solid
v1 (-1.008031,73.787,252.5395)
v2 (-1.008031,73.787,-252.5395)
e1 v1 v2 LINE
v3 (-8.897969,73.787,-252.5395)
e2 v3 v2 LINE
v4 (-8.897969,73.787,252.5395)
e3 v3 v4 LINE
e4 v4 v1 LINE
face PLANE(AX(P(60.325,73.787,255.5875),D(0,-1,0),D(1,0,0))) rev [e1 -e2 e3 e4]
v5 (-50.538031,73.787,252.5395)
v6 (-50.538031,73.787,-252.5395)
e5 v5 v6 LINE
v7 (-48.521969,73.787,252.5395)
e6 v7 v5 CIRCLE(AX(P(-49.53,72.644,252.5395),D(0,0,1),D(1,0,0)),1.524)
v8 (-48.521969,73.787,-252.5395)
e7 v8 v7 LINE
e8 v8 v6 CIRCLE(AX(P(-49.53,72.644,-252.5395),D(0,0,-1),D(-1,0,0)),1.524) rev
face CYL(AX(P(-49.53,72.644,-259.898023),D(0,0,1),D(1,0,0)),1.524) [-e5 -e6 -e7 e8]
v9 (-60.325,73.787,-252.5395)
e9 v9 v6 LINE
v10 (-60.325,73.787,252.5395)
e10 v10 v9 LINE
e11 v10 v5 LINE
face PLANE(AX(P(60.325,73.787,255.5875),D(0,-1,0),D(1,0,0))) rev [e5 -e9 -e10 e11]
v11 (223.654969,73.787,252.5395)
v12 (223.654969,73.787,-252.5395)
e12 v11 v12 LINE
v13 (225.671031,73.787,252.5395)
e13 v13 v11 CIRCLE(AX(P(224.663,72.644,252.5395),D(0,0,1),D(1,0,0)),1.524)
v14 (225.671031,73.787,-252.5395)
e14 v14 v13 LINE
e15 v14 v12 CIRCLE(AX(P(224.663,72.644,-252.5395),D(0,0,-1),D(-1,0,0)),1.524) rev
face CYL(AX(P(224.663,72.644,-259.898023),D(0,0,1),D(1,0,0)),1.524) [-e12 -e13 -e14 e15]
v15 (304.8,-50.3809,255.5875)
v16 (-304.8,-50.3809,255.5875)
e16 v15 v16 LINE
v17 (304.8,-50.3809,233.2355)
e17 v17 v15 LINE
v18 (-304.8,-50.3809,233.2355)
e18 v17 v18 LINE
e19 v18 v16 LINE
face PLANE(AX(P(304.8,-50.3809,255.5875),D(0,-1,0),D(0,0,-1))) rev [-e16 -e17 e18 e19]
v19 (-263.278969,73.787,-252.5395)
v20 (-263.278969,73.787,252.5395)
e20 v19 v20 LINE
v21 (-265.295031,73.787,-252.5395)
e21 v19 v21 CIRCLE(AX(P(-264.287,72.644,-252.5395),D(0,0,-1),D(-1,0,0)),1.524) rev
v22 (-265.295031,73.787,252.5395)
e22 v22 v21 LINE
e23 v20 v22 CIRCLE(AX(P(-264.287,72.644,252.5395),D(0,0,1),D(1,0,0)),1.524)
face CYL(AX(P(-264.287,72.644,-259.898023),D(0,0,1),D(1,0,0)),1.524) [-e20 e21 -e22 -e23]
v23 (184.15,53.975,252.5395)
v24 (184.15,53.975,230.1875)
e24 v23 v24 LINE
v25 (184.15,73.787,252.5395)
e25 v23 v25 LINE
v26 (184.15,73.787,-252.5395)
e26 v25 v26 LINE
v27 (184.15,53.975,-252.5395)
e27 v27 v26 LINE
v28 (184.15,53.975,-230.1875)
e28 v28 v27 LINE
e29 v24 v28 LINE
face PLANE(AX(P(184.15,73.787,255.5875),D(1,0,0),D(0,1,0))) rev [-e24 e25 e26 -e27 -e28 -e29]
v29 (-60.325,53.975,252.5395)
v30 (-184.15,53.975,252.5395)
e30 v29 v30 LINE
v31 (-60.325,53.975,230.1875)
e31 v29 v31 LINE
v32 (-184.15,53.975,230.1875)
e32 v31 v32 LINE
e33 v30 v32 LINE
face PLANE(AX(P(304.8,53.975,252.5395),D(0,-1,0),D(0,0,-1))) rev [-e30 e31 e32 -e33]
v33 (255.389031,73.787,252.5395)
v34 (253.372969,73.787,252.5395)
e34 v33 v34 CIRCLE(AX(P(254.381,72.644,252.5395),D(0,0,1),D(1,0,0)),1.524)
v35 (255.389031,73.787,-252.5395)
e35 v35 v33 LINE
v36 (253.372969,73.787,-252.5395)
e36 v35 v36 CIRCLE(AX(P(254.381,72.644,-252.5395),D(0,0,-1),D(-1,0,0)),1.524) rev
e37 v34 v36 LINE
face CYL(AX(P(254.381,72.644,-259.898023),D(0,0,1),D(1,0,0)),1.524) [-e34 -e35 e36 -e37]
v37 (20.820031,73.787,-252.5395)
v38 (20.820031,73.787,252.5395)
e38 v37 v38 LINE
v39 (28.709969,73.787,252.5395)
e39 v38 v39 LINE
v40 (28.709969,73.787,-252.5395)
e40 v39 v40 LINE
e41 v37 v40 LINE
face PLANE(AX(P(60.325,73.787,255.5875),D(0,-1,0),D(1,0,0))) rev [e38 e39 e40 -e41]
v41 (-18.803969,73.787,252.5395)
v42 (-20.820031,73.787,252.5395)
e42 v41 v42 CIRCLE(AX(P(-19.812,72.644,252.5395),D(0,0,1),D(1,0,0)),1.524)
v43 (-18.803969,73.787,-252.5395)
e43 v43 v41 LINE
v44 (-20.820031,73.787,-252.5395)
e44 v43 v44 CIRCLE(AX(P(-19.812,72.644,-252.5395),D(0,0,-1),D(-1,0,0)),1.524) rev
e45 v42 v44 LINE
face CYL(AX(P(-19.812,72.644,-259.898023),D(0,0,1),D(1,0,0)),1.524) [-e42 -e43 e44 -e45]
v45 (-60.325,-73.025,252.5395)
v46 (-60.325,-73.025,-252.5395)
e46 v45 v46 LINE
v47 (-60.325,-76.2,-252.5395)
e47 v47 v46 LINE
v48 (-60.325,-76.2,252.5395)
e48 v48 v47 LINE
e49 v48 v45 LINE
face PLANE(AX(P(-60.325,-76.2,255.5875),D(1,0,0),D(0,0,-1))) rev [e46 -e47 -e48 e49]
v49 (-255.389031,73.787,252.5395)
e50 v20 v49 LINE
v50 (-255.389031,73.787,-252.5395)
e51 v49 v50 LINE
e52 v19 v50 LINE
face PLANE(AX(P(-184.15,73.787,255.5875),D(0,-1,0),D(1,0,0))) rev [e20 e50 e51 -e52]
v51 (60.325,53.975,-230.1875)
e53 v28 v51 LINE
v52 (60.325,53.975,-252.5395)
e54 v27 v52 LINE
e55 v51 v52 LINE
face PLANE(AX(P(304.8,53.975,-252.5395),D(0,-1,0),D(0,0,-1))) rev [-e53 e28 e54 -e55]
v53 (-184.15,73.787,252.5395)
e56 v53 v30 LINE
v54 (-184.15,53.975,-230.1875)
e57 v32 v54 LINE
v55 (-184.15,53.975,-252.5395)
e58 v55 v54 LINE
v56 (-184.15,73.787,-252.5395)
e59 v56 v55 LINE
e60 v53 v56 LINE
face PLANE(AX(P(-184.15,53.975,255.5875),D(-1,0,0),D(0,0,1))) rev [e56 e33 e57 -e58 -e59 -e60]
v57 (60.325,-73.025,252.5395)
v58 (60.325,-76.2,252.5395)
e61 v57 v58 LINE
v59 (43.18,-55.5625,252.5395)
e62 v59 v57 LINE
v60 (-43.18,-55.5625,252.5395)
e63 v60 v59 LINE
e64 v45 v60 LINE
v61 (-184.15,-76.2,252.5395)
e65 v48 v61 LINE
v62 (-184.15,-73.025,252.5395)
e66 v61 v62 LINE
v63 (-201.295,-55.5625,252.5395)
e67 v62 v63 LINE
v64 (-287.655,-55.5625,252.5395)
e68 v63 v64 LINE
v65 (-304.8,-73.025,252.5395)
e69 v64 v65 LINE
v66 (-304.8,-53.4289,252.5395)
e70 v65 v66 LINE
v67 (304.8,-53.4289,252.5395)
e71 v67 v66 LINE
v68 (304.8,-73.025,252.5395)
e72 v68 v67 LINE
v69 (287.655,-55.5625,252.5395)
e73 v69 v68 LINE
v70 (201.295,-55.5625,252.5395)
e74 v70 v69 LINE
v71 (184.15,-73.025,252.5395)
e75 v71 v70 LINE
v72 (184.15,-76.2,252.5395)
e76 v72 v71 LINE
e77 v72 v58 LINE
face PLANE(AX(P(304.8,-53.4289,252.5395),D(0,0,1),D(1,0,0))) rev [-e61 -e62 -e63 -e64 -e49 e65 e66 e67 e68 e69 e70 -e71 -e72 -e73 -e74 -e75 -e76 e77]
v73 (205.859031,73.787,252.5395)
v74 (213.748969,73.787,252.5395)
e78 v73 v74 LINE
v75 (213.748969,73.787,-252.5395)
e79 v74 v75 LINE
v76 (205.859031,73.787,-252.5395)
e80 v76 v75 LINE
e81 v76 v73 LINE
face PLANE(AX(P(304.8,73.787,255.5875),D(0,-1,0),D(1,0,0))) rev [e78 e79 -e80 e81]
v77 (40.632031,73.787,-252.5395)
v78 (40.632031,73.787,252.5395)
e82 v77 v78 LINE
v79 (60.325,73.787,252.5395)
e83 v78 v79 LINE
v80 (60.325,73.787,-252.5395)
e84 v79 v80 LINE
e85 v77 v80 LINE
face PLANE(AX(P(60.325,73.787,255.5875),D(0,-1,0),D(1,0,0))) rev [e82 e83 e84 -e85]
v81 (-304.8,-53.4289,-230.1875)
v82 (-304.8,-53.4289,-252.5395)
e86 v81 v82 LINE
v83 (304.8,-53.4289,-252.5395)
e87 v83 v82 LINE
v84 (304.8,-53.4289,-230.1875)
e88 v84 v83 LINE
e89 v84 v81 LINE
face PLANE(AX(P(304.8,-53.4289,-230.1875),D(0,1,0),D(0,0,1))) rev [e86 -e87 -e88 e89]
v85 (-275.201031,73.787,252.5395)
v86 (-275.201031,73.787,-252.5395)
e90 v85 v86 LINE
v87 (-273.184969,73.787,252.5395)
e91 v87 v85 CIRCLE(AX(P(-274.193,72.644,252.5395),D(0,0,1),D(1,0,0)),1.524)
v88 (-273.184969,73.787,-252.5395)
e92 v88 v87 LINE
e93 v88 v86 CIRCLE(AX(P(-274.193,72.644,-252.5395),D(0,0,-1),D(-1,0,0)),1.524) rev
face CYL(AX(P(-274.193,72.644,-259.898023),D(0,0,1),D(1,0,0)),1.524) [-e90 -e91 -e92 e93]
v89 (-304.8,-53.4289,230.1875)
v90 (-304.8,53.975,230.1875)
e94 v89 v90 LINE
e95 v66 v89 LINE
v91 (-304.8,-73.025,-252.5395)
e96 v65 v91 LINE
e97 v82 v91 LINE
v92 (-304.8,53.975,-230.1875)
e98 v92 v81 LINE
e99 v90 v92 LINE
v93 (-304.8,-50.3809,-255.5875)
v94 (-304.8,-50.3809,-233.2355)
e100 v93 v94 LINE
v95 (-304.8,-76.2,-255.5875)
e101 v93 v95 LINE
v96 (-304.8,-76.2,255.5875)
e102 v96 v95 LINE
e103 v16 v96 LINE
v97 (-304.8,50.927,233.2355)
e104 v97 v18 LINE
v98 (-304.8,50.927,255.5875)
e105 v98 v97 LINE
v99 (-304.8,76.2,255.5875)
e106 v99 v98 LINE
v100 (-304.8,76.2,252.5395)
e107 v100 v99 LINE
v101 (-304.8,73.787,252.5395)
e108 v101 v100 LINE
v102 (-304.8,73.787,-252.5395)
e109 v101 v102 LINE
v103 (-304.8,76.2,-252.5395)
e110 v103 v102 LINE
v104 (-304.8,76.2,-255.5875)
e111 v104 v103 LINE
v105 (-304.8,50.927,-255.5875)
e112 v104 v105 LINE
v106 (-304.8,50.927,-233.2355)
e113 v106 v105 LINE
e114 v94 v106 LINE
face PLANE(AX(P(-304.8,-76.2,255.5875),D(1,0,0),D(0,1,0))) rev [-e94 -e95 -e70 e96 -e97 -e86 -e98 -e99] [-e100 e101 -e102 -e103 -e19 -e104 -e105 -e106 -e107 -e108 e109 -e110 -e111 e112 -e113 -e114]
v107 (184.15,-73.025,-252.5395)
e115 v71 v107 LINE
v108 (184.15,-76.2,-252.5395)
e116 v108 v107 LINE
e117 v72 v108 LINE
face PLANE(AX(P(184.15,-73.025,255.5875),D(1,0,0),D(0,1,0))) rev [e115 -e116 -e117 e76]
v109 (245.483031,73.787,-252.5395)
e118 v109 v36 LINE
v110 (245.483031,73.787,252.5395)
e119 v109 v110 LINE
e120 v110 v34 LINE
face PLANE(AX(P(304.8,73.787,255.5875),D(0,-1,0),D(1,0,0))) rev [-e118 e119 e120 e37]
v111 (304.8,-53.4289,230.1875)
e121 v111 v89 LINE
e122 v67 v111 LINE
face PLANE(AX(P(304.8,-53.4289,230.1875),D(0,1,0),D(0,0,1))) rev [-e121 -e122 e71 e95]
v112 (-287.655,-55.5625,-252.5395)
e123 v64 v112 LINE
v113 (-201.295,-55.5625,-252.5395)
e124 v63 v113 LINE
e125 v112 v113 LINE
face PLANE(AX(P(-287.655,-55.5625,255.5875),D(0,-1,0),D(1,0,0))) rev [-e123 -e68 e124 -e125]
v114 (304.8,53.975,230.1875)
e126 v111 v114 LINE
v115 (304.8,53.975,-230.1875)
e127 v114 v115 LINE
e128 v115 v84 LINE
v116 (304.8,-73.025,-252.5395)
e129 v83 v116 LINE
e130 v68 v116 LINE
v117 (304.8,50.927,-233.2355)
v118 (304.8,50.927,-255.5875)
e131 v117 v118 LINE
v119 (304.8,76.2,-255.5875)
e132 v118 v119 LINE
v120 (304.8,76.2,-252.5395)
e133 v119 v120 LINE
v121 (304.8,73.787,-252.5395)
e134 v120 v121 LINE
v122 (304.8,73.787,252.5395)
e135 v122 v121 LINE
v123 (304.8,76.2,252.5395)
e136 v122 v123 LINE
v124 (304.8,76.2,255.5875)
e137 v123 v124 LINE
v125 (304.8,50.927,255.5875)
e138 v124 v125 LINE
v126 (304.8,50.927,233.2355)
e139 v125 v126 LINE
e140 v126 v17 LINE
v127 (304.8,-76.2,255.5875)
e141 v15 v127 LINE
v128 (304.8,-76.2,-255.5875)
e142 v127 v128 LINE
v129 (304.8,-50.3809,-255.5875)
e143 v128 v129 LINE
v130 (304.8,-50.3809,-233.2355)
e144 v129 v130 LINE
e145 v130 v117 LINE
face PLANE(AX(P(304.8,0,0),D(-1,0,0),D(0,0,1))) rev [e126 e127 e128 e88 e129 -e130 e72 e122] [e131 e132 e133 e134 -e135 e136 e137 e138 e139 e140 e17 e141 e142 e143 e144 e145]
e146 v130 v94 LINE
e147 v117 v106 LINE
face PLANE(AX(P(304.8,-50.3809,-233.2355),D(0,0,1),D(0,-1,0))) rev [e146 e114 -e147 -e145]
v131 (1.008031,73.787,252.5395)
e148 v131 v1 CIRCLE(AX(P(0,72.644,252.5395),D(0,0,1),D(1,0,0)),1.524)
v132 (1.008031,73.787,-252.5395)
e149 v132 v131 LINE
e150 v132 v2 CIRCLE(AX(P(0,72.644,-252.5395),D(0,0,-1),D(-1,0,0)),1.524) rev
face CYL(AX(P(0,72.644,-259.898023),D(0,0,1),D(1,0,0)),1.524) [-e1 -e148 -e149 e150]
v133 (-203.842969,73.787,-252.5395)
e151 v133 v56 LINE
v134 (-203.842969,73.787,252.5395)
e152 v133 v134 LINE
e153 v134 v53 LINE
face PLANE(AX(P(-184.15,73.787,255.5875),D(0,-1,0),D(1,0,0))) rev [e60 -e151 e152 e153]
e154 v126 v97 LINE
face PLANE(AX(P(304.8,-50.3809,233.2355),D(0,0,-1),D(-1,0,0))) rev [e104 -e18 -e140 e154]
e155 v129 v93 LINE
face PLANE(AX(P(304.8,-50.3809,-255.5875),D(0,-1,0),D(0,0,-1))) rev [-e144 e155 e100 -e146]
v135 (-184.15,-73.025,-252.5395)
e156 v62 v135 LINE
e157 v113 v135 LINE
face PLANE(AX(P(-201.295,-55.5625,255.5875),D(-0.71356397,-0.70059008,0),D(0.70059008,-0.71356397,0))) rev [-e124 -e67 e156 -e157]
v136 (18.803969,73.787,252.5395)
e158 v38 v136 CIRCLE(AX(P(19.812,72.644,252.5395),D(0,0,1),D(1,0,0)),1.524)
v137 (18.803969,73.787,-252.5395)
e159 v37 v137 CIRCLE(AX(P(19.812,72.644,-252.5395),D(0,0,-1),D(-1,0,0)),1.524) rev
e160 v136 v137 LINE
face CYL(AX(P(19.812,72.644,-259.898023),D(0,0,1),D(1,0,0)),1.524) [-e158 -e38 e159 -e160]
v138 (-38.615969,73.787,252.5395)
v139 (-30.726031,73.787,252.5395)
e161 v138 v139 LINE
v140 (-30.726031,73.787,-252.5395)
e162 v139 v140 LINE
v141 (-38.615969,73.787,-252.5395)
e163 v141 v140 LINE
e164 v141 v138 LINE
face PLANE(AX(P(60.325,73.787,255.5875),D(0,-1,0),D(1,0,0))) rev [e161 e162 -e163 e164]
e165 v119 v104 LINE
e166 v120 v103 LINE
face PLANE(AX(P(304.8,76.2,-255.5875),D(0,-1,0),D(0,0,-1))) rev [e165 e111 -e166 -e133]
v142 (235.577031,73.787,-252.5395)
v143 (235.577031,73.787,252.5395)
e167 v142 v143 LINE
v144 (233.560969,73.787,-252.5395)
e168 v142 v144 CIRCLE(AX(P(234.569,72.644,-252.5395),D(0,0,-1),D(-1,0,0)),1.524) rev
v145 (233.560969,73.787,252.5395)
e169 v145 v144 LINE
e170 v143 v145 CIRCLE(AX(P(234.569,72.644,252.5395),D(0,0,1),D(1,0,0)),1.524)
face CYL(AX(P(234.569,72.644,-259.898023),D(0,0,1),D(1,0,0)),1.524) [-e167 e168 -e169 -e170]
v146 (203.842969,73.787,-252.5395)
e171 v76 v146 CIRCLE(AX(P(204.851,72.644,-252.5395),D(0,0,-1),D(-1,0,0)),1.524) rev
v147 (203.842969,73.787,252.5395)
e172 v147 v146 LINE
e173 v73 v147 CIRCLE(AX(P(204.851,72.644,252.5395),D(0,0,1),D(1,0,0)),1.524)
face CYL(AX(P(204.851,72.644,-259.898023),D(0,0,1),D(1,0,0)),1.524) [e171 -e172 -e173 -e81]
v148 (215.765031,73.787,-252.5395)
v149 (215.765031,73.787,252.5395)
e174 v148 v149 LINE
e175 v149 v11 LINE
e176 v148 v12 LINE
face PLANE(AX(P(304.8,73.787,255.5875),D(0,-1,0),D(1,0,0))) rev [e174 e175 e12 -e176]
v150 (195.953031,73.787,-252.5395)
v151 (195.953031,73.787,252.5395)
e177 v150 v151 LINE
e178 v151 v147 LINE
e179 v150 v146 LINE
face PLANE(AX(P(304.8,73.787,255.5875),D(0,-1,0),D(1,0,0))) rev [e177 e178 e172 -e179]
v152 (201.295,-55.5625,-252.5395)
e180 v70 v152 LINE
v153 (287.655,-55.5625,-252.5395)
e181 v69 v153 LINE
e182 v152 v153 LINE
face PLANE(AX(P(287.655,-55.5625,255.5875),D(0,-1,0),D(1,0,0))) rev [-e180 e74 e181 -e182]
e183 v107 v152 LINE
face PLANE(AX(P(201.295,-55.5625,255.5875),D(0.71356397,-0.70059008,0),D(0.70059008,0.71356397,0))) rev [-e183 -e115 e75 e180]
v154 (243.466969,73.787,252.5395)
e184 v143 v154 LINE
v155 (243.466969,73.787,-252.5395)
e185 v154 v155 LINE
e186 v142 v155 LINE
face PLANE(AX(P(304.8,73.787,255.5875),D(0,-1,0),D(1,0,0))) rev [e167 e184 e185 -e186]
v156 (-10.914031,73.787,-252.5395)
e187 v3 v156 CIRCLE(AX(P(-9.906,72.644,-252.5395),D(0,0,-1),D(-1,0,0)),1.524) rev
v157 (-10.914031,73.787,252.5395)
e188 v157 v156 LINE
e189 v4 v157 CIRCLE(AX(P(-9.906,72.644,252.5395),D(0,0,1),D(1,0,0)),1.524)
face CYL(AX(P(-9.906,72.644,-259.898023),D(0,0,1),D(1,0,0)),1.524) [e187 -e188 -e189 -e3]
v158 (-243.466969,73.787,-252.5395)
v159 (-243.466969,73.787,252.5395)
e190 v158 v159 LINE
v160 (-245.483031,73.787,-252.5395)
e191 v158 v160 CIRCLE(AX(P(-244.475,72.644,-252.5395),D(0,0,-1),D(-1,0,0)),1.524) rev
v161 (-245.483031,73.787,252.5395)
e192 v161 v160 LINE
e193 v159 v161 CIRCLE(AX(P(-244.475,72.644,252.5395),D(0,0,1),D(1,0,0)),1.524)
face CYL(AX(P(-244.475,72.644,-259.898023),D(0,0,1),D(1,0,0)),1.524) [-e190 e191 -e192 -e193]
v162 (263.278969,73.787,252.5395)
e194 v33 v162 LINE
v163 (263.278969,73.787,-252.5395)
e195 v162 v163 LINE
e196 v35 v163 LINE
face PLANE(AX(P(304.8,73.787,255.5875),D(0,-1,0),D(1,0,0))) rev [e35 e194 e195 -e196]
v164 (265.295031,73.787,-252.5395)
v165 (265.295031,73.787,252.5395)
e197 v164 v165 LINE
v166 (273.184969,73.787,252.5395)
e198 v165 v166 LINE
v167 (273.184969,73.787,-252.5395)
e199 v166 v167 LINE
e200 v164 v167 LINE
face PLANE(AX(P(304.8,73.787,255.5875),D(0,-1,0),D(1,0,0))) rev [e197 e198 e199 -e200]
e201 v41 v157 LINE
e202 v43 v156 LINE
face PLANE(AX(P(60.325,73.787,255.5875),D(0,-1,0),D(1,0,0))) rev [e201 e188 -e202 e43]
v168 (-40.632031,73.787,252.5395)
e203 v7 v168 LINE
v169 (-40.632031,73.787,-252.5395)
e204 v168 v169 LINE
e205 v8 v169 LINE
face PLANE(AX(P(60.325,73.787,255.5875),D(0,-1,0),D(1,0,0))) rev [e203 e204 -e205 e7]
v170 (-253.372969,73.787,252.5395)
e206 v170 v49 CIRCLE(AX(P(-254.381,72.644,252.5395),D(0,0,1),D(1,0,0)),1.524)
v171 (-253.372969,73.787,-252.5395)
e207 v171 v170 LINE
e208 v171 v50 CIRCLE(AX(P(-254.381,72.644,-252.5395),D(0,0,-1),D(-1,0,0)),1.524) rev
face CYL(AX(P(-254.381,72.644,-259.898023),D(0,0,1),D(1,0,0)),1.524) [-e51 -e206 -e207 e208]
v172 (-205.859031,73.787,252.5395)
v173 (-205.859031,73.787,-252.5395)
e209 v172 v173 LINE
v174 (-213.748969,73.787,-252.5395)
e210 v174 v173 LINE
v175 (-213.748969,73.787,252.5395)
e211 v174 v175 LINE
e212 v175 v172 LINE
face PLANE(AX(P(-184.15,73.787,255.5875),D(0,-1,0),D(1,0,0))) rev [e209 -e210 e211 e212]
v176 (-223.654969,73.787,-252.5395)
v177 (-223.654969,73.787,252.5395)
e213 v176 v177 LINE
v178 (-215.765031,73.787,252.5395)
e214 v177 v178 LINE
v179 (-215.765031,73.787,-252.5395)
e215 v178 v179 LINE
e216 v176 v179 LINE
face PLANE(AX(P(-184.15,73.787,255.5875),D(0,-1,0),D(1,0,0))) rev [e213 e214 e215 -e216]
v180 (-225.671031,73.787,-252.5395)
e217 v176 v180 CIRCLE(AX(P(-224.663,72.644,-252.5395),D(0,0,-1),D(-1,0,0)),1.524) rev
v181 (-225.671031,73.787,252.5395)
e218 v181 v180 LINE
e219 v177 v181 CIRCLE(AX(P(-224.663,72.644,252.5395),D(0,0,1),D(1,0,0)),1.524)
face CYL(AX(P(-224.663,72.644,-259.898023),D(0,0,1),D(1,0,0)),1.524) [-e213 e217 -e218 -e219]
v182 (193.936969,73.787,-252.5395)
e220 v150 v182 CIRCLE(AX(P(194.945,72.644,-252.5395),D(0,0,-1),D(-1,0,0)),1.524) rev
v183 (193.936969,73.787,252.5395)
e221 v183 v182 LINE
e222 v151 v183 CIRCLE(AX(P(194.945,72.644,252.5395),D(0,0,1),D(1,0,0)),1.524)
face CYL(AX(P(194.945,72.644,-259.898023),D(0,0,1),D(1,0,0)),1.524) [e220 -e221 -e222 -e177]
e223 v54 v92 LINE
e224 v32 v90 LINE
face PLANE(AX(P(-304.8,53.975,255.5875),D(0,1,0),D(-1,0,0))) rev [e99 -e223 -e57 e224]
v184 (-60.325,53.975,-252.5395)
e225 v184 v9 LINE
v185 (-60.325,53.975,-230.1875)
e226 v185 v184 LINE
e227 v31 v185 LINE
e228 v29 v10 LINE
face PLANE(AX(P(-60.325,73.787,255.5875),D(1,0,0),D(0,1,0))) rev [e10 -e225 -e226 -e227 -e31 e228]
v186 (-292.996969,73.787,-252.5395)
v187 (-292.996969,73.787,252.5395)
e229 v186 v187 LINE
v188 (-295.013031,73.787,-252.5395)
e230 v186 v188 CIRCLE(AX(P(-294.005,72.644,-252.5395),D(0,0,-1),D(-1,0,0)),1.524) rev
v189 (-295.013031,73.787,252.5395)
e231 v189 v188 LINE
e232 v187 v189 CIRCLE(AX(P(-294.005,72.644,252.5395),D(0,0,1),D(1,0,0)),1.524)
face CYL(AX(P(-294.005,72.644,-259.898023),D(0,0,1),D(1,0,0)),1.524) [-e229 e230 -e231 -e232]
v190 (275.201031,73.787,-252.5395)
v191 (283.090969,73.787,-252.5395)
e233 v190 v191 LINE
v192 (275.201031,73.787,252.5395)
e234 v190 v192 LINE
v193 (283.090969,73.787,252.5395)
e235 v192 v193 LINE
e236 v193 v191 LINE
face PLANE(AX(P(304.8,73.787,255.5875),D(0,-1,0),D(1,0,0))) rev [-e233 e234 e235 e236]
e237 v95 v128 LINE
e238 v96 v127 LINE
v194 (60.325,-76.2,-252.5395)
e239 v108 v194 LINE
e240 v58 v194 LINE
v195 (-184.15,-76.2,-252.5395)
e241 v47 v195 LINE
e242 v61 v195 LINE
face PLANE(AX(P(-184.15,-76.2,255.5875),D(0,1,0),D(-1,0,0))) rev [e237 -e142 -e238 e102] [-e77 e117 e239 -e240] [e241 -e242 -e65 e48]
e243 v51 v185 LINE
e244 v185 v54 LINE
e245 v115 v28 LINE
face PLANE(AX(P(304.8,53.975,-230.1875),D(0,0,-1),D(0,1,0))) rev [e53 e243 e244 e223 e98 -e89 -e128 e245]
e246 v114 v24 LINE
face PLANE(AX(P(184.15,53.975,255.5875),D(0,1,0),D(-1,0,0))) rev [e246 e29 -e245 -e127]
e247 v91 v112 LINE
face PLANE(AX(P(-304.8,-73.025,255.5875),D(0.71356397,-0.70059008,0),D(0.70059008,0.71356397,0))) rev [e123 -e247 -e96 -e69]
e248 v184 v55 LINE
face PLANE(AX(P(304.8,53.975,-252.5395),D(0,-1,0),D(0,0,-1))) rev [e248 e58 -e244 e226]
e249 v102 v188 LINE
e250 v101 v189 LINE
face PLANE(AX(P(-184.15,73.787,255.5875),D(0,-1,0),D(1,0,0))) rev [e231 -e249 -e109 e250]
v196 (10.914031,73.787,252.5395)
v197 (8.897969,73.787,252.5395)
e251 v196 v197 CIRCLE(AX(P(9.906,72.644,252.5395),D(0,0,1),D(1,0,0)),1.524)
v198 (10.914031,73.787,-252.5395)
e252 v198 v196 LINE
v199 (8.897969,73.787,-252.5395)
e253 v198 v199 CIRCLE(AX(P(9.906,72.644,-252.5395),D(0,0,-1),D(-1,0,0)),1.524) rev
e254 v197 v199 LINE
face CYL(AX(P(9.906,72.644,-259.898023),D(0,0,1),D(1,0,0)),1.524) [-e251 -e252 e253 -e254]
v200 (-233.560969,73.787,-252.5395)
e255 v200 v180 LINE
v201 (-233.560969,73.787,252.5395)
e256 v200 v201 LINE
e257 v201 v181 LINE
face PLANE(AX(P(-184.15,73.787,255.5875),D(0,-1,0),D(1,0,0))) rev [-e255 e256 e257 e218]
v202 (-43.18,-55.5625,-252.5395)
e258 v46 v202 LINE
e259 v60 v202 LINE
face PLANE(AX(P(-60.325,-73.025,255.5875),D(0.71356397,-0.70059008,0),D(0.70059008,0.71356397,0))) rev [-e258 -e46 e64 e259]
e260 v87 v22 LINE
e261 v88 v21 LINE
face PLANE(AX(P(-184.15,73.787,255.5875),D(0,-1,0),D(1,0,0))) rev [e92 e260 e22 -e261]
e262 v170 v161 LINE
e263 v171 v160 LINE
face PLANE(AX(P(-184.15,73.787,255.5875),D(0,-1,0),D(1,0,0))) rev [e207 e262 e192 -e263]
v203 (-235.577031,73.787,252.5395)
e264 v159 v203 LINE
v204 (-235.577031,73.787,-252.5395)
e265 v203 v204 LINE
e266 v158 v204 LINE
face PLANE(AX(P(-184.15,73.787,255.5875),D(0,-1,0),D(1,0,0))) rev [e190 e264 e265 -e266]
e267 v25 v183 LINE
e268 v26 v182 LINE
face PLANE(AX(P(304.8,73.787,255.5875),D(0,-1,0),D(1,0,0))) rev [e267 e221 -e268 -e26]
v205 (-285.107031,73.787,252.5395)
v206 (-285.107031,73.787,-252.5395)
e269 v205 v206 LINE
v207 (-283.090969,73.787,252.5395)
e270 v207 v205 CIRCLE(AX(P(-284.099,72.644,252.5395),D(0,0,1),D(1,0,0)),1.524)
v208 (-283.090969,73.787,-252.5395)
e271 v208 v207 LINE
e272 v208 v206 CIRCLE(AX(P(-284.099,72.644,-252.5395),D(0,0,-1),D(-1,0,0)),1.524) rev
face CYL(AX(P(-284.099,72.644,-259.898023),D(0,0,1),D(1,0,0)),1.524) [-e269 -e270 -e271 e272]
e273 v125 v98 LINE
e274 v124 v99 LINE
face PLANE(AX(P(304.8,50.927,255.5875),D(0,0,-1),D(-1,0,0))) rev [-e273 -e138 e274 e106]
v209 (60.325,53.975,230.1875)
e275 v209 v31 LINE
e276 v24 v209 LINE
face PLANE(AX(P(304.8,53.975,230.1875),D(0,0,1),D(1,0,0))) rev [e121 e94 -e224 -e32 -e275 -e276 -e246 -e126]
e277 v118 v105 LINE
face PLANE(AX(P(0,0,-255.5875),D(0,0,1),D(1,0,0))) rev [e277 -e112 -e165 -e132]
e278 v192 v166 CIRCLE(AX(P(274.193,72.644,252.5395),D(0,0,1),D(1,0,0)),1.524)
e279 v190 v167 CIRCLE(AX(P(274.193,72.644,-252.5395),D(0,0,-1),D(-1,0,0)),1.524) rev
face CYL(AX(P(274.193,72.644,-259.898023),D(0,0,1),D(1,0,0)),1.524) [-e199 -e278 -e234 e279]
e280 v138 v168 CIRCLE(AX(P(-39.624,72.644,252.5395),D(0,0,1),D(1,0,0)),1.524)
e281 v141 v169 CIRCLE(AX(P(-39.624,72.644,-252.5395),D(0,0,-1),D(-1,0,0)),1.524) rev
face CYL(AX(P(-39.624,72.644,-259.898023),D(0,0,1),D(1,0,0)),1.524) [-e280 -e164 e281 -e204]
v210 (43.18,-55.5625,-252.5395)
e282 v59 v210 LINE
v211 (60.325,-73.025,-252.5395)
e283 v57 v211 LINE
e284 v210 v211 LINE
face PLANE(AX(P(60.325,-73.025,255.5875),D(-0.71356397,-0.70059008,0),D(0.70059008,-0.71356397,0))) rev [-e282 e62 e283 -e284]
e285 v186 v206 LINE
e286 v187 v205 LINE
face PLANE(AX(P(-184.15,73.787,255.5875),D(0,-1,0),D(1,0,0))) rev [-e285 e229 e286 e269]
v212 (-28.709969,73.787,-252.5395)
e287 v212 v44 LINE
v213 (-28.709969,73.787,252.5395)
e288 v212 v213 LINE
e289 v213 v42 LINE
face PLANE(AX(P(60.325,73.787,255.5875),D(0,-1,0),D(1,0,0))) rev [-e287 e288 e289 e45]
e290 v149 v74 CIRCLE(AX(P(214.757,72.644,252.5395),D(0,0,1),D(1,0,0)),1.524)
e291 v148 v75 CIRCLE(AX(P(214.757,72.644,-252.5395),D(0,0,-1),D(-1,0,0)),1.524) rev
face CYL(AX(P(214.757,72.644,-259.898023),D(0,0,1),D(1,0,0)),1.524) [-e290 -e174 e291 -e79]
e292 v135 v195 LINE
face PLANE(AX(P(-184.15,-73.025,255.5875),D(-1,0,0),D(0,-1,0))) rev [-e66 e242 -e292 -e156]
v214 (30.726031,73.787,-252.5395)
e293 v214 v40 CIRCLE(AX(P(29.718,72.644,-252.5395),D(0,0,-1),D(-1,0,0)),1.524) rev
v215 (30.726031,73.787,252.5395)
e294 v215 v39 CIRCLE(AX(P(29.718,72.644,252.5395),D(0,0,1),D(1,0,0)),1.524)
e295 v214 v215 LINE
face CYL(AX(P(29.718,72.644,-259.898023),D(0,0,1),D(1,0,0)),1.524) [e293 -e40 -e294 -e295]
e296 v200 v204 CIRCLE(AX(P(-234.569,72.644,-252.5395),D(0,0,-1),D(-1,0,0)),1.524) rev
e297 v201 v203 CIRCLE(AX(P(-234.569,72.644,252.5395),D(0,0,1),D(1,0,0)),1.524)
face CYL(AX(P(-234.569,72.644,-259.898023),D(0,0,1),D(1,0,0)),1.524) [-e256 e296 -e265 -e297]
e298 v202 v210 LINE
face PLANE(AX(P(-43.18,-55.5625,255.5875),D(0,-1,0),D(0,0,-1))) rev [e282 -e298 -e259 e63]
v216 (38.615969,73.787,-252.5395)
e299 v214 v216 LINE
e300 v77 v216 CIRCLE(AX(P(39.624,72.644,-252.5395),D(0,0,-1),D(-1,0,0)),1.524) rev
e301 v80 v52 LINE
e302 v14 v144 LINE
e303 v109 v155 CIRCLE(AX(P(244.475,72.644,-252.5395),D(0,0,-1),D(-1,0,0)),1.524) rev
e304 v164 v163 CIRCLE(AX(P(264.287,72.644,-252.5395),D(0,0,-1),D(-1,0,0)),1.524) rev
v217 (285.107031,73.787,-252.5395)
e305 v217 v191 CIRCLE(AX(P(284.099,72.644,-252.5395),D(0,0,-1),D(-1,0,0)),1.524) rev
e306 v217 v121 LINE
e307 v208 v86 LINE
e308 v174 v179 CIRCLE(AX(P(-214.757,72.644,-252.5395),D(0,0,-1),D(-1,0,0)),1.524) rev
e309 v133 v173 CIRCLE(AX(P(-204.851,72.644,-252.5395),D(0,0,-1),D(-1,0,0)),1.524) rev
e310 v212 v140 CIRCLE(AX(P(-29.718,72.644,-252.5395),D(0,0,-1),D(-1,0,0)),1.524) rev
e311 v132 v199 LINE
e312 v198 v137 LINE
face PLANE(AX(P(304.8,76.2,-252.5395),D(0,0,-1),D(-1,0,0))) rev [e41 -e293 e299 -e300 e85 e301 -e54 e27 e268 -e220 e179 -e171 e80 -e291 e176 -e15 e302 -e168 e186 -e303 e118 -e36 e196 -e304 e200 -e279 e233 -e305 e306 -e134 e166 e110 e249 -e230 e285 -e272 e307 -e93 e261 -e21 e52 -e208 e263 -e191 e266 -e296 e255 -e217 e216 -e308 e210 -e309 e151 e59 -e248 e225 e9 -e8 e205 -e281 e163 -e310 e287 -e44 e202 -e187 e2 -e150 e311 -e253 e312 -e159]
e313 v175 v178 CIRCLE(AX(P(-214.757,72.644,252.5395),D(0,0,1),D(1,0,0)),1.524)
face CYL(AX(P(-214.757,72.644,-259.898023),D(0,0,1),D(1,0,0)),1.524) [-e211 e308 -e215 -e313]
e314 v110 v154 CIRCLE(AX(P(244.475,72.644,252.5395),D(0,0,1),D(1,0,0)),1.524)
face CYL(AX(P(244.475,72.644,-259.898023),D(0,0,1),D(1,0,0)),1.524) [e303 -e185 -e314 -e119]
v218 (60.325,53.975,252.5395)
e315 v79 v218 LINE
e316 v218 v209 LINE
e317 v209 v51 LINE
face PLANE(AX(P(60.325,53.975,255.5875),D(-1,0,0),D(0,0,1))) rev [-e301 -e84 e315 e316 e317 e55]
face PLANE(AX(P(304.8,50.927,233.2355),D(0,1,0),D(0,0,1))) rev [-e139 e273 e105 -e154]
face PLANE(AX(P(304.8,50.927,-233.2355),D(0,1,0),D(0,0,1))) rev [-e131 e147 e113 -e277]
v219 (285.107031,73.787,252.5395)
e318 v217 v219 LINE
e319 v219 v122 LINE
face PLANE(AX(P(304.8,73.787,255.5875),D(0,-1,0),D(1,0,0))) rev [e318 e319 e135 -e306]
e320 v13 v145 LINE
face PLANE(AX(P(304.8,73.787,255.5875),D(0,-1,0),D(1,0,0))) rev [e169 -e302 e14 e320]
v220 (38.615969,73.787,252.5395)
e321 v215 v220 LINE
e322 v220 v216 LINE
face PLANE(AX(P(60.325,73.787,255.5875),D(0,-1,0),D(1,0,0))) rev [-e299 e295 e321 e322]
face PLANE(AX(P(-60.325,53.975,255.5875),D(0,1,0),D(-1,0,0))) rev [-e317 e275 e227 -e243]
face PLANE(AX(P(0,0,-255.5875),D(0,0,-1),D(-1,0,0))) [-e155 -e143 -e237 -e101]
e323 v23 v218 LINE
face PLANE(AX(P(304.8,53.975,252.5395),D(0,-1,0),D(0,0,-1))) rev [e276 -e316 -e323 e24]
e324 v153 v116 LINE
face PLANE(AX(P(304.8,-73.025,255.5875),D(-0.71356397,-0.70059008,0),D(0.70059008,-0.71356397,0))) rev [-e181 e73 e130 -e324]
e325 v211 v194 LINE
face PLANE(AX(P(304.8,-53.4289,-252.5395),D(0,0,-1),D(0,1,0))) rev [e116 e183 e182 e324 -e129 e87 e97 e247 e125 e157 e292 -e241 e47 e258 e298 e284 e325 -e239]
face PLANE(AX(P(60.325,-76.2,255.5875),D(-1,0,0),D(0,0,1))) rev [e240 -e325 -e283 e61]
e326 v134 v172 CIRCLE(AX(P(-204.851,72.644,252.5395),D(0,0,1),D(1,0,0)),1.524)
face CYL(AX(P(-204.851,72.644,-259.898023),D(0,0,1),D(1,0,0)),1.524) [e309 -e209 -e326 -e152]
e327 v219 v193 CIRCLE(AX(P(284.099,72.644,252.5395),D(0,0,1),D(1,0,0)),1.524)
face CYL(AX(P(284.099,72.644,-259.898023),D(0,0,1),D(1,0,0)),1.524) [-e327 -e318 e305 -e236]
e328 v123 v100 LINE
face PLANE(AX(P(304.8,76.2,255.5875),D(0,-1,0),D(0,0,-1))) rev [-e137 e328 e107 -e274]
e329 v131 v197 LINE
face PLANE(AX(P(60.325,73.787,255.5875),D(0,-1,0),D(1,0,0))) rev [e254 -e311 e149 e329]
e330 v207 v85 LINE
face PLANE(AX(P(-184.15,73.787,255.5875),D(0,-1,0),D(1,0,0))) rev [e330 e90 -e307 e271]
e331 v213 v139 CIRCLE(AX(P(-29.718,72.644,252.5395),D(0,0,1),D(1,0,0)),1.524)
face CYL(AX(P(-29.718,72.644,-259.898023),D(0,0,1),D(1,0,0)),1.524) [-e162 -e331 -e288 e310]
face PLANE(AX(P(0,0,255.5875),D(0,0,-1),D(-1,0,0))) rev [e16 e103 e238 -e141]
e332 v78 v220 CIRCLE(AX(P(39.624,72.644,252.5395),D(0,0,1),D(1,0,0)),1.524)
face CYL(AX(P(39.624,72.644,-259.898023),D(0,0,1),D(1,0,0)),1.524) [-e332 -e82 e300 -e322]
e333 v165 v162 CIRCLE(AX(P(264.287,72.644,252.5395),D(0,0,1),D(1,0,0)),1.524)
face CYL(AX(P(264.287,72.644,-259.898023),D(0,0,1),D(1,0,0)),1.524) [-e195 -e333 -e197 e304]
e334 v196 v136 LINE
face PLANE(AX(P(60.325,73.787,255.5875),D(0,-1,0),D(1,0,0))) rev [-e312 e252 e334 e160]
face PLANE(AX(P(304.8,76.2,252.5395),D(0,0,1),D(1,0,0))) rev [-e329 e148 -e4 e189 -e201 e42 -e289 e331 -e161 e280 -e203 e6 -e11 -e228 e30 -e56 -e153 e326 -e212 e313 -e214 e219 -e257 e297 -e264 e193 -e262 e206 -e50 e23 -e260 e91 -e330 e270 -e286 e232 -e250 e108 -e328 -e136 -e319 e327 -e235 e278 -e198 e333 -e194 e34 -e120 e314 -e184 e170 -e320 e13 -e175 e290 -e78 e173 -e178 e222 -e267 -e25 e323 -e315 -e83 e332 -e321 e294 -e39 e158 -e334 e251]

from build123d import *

# Parameters (mm, degrees)
BOSS_EXTRUDE1_DEPTH   = 255.5875
BOSS_EXTRUDE1_2_DEPTH = 255.5875
BOSS_EXTRUDE1_3_DEPTH = 255.5875
SKETCH4_W             = 120.65
SKETCH4_H             = 19.812
BOSS_EXTRUDE2_DEPTH   = 255.5875
SKETCH5_R             = 1.524
BOSS_EXTRUDE3_DEPTH   = 511.175
SKETCH_PATTERN1_START = -255.5875
SKETCH_PATTERN1_DEPTH = 511.175
BOSS_EXTRUDE4_DEPTH   = 304.8


# Read off the part's stored shape, not the designer's step: Sketch-Pattern1
with BuildPart() as part:
    # Sketch3 → Boss-Extrude1 (new, symmetric)
    with BuildSketch(Plane.XY):
        Polygon((-304.8, -76.2), (-304.8, -73.025), (-287.655, -55.5625), (-201.295, -55.5625), (-184.15, -73.025), (-184.15, -76.2), align=None)
    extrude(amount=BOSS_EXTRUDE1_DEPTH, both=True)



with BuildPart() as body_2:
    # Sketch3 → Boss-Extrude1 2 (new, symmetric)
    with BuildSketch(Plane.XY):
        Polygon((184.15, -73.025), (184.15, -76.2), (304.8, -76.2), (304.8, -73.025), (287.655, -55.5625), (201.295, -55.5625), align=None)
    extrude(amount=BOSS_EXTRUDE1_2_DEPTH, both=True)


with BuildPart() as body_3:
    # Sketch3 → Boss-Extrude1 3 (new, symmetric)
    with BuildSketch(Plane.XY):
        Polygon((-43.18, -55.5625), (43.18, -55.5625), (60.325, -73.025), (60.325, -76.2), (-60.325, -76.2), (-60.325, -73.025), align=None)
    extrude(amount=BOSS_EXTRUDE1_3_DEPTH, both=True)


with BuildPart() as body_4:
    # Sketch4 → Boss-Extrude2 (new, symmetric)
    with BuildSketch(Plane.XY):
        with Locations((-244.475, 63.881)):
            Rectangle(SKETCH4_W, SKETCH4_H)
    extrude(amount=BOSS_EXTRUDE2_DEPTH, both=True)

    # Sketch5 → Boss-Extrude3 (add)
    with BuildSketch(Plane.XY.offset(255.5875)):
        with Locations((-294.005, 72.644)):
            Circle(SKETCH5_R)
        with Locations((-284.099, 72.644)):
            Circle(SKETCH5_R)
        with Locations((-274.193, 72.644)):
            Circle(SKETCH5_R)
        with Locations((-264.287, 72.644)):
            Circle(SKETCH5_R)
        with Locations((-254.381, 72.644)):
            Circle(SKETCH5_R)
        with Locations((-244.475, 72.644)):
            Circle(SKETCH5_R)
        with Locations((-234.569, 72.644)):
            Circle(SKETCH5_R)
        with Locations((-224.663, 72.644)):
            Circle(SKETCH5_R)
        with Locations((-214.757, 72.644)):
            Circle(SKETCH5_R)
        with Locations((-204.851, 72.644)):
            Circle(SKETCH5_R)
    extrude(amount=-BOSS_EXTRUDE3_DEPTH)


with BuildPart() as body_5:
    # Sketch-Pattern1 outline → Sketch-Pattern1 (new body)
    with BuildSketch(Plane.XY.offset(SKETCH_PATTERN1_START)):
        with BuildLine():
            Line((60.325, 73.787), (40.63203125, 73.787))
            ThreePointArc((40.63203125, 73.787), (39.624, 74.168), (38.61596875, 73.787))
            Line((38.61596875, 73.787), (30.72603125, 73.787))
            ThreePointArc((30.72603125, 73.787), (29.718, 74.168), (28.70996875, 73.787))
            Line((28.70996875, 73.787), (20.82003125, 73.787))
            ThreePointArc((20.82003125, 73.787), (19.812, 74.168), (18.80396875, 73.787))
            Line((18.80396875, 73.787), (10.91403125, 73.787))
            ThreePointArc((10.91403125, 73.787), (9.906, 74.168), (8.89796875, 73.787))
            Line((8.89796875, 73.787), (1.00803125, 73.787))
            ThreePointArc((1.00803125, 73.787), (0, 74.168), (-1.00803125, 73.787))
            Line((-1.00803125, 73.787), (-8.89796875, 73.787))
            ThreePointArc((-8.89796875, 73.787), (-9.906, 74.168), (-10.91403125, 73.787))
            Line((-10.91403125, 73.787), (-18.80396875, 73.787))
            ThreePointArc((-18.80396875, 73.787), (-19.812, 74.168), (-20.82003125, 73.787))
            Line((-20.82003125, 73.787), (-28.70996875, 73.787))
            ThreePointArc((-28.70996875, 73.787), (-29.718, 74.168), (-30.72603125, 73.787))
            Line((-30.72603125, 73.787), (-38.61596875, 73.787))
            ThreePointArc((-38.61596875, 73.787), (-39.624, 74.168), (-40.63203125, 73.787))
            Line((-40.63203125, 73.787), (-48.52196875, 73.787))
            ThreePointArc((-48.52196875, 73.787), (-49.53, 74.168), (-50.53803125, 73.787))
            Line((-50.53803125, 73.787), (-60.325, 73.787))
            Line((-60.325, 73.787), (-60.325, 53.975))
            Line((-60.325, 53.975), (60.325, 53.975))
            Line((60.325, 53.975), (60.325, 73.787))
        make_face()
        with BuildLine():
            Line((304.8, 73.787), (285.10703125, 73.787))
            ThreePointArc((285.10703125, 73.787), (284.099, 74.168), (283.09096875, 73.787))
            Line((283.09096875, 73.787), (275.20103125, 73.787))
            ThreePointArc((275.20103125, 73.787), (274.193, 74.168), (273.18496875, 73.787))
            Line((273.18496875, 73.787), (265.29503125, 73.787))
            ThreePointArc((265.29503125, 73.787), (264.287, 74.168), (263.27896875, 73.787))
            Line((263.27896875, 73.787), (255.38903125, 73.787))
            ThreePointArc((255.38903125, 73.787), (254.381, 74.168), (253.37296875, 73.787))
            Line((253.37296875, 73.787), (245.48303125, 73.787))
            ThreePointArc((245.48303125, 73.787), (244.475, 74.168), (243.46696875, 73.787))
            Line((243.46696875, 73.787), (235.57703125, 73.787))
            ThreePointArc((235.57703125, 73.787), (234.569, 74.168), (233.56096875, 73.787))
            Line((233.56096875, 73.787), (225.67103125, 73.787))
            ThreePointArc((225.67103125, 73.787), (224.663, 74.168), (223.65496875, 73.787))
            Line((223.65496875, 73.787), (215.76503125, 73.787))
            ThreePointArc((215.76503125, 73.787), (214.757, 74.168), (213.74896875, 73.787))
            Line((213.74896875, 73.787), (205.85903125, 73.787))
            ThreePointArc((205.85903125, 73.787), (204.851, 74.168), (203.84296875, 73.787))
            Line((203.84296875, 73.787), (195.95303125, 73.787))
            ThreePointArc((195.95303125, 73.787), (194.945, 74.168), (193.93696875, 73.787))
            Line((193.93696875, 73.787), (184.15, 73.787))
            Line((184.15, 73.787), (184.15, 53.975))
            Line((184.15, 53.975), (304.8, 53.975))
            Line((304.8, 53.975), (304.8, 73.787))
        make_face()
    extrude(amount=SKETCH_PATTERN1_DEPTH)


with BuildPart() as part_1:
    add(part.part)

    add(body_2.part)  # Boss-Extrude4 merges body 2

    add(body_3.part)  # Boss-Extrude4 merges body 3

    add(body_4.part)  # Boss-Extrude4 merges body 4

    add(body_5.part)  # Boss-Extrude4 merges body 5
    # Sketch8 → Boss-Extrude4 (add, symmetric)
    with BuildSketch(Plane(origin=(0, 0, 0), x_dir=(0, 0, -1), z_dir=(1, 0, 0))):
        Polygon((-255.5875, -76.2), (-255.5875, -50.3809), (-233.2355, -50.3809), (-233.2355, 50.927), (-255.5875, 50.927), (-255.5875, 76.2), (-252.5395, 76.2), (-252.5395, 53.975), (-230.1875, 53.975), (-230.1875, -53.4289), (-252.5395, -53.4289), (-252.5395, -76.2), align=None)
        Polygon((252.5395, -53.4289), (252.5395, -76.2), (255.5875, -76.2), (255.5875, -50.3809), (233.2355, -50.3809), (233.2355, 50.927), (255.5875, 50.927), (255.5875, 76.2), (252.5395, 76.2), (252.5395, 53.975), (230.1875, 53.975), (230.1875, -53.4289), align=None)
    extrude(amount=BOSS_EXTRUDE4_DEPTH, both=True)


solid = part_1.part
